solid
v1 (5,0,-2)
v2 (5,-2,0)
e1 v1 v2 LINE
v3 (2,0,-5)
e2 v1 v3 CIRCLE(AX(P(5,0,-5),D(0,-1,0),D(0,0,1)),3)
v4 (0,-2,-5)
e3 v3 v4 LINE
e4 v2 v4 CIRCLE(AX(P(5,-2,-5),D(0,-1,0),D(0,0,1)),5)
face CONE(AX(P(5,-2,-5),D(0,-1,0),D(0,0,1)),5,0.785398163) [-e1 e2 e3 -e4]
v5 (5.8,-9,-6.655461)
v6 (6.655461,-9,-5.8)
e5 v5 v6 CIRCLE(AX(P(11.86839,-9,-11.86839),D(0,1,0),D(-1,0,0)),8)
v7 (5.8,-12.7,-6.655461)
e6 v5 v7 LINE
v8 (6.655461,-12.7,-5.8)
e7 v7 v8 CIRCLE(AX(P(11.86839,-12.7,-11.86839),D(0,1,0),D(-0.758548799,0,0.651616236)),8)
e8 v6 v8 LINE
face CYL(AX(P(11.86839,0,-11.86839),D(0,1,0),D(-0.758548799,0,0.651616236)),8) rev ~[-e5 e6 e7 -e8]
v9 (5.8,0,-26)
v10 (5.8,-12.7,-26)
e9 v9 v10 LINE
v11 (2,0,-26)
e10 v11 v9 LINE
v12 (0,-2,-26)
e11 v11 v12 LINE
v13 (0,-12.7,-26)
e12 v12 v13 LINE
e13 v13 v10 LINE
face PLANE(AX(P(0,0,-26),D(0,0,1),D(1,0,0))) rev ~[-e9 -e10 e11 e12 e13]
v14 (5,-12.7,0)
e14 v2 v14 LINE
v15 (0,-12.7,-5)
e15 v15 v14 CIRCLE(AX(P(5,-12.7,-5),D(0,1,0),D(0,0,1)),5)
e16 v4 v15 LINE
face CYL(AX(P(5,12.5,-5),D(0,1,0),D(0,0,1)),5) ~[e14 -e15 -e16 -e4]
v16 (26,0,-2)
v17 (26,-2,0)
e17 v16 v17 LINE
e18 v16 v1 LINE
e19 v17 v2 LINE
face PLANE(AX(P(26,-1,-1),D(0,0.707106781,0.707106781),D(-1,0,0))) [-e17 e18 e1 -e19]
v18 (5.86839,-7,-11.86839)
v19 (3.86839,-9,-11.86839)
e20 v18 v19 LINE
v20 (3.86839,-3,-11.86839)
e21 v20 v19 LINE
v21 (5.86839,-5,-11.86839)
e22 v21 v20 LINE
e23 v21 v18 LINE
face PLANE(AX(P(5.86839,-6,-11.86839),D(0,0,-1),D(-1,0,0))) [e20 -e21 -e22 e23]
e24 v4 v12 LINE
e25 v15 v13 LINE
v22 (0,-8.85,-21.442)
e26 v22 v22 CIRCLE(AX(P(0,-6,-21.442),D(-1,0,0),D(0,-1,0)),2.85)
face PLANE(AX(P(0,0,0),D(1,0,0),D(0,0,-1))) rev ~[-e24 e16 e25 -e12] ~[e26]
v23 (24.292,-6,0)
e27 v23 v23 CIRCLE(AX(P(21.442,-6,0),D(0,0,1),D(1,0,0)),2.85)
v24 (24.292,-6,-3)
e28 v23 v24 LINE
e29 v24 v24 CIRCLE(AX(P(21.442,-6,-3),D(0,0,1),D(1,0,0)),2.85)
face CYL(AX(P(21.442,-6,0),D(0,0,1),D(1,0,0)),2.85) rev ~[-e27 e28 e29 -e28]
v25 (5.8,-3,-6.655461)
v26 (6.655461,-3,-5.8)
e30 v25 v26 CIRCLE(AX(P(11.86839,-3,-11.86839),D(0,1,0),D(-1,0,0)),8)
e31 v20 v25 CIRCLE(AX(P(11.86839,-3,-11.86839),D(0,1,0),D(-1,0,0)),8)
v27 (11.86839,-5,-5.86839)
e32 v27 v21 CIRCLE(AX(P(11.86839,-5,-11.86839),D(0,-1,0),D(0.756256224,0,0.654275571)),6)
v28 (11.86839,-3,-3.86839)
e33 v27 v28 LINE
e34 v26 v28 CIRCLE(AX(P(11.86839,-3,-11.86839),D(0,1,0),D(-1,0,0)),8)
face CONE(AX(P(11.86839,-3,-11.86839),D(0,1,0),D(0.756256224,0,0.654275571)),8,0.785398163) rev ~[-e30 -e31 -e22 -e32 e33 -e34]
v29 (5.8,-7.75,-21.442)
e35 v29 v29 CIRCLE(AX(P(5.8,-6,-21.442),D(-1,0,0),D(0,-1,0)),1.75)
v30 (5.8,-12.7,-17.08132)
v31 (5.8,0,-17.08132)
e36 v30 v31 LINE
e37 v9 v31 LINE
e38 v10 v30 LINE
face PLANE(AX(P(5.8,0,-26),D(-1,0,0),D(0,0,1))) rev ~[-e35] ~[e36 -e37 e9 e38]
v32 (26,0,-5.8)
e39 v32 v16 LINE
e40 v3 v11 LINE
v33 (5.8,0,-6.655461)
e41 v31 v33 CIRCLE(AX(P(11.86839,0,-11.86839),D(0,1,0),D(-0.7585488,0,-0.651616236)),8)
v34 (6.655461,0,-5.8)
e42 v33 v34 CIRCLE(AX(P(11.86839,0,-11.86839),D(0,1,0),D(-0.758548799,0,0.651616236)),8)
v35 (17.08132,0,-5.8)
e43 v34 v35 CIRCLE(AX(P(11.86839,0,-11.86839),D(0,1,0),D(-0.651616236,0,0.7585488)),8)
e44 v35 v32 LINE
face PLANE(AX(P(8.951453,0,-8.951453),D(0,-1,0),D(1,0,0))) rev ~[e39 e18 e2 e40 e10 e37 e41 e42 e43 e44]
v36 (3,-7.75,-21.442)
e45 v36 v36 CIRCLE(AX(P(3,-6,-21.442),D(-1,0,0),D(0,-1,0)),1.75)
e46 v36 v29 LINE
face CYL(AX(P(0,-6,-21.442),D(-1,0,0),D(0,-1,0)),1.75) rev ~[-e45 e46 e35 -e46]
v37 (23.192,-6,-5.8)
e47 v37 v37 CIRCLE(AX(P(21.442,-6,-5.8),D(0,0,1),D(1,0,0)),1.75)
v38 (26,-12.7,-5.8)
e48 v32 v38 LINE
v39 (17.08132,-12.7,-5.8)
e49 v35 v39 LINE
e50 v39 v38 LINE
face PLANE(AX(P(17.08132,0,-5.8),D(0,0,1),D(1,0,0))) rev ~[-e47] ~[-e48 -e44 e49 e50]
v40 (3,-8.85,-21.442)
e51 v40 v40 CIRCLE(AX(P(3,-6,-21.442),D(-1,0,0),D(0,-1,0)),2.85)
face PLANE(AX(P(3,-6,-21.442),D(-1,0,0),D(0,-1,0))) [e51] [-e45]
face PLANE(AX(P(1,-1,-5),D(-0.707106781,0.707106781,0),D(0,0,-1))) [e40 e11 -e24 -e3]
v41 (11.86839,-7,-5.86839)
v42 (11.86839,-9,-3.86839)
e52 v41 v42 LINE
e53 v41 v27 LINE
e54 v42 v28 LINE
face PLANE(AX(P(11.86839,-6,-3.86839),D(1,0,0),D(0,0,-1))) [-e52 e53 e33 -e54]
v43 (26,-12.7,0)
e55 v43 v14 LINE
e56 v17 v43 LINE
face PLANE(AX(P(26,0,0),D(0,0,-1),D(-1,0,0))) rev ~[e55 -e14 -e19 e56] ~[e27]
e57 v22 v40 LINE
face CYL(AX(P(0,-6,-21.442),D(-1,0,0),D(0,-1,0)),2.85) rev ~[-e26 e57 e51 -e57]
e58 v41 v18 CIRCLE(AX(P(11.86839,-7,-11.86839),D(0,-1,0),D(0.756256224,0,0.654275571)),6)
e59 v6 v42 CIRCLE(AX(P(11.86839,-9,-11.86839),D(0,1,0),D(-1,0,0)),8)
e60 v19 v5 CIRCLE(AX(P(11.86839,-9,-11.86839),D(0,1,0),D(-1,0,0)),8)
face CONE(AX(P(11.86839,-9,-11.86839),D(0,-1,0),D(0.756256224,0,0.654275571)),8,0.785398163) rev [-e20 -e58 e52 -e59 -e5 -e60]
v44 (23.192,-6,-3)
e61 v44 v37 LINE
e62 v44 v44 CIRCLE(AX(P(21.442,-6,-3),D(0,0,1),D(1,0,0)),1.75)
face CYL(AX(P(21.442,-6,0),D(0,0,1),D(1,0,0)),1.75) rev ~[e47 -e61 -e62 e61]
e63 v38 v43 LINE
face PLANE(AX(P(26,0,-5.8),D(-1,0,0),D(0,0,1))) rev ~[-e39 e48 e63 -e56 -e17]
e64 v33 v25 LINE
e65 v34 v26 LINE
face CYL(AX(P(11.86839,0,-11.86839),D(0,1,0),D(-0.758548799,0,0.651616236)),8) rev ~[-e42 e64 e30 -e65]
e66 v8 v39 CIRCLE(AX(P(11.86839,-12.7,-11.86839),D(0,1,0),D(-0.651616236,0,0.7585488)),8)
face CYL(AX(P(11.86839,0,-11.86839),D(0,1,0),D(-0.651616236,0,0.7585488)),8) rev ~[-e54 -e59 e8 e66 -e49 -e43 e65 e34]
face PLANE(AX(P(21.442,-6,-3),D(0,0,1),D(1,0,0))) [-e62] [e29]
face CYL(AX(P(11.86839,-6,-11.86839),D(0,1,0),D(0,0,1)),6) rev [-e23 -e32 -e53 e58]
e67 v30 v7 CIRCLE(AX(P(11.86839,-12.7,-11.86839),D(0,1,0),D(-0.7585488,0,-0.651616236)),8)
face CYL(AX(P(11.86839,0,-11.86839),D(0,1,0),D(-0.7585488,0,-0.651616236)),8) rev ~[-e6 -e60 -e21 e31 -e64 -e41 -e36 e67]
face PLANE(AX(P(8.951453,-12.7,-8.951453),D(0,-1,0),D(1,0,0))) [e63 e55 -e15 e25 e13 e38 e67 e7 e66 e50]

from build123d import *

# Parameters (mm, degrees)
F1_DEPTH     = 12.7
F3_R         = 1.75
F4_DEPTH     = 26.001
F5_R         = 1.75
F6_DEPTH     = 26.001
F8_DEPTH     = 3
F9_T4_ANGLE  = 188.2705145196
F9_S5_R      = 8
F9_T6_DEPTH  = 11
F9_T10_ANGLE = 188.2705145196
F9_S11_R     = 8
F9_T12_DEPTH = 11
F10_R        = 2.85
F10_R_2      = 1.75
F11_DEPTH    = 3
F12_R        = 2.85
F13_DEPTH    = 3
F14_T1_DEPTH = 37.7
F15_SIZE     = 2


# Not quite as in the source:
# - a fillet or chamfer that OpenCascade refuses, or shapes differently, is made with other operations: its cross-section is extruded or revolved along the edge and cut away or added


with BuildPart() as f1:
    # F0 (on Front) → F1 (new body)
    with BuildSketch(Plane.XZ):
        with BuildLine():
            Line((26, 0), (0, 0))
            Line((0, 0), (0, -26))
            Line((0, -26), (5.8, -26))
            Line((5.8, -26), (5.8, -17.0813202825))
            ThreePointArc((5.8, -17.0813202825), (3.8683903961, -11.8683903961), (5.8, -6.6554605098))
            Line((5.8, -6.6554605098), (5.8, -5.8))
            Line((5.8, -5.8), (6.6554605098, -5.8))
            ThreePointArc((6.6554605098, -5.8), (11.8683903961, -3.8683903961), (17.0813202825, -5.8))
            Line((17.0813202825, -5.8), (26, -5.8))
            Line((26, -5.8), (26, 0))
        make_face()
        with BuildLine():
            ThreePointArc((5.8, -6.6554605098), (6.2115361467, -6.2115361467), (6.6554605098, -5.8))
            Line((6.6554605098, -5.8), (5.8, -5.8))
            Line((5.8, -5.8), (5.8, -6.6554605098))
        make_face()
    extrude(amount=F1_DEPTH)

    # F3 (on face) → F4 (cut, through all)
    with BuildSketch(Plane.XY):
        with Locations((21.442, -6)):
            Circle(F3_R)
    extrude(amount=-F4_DEPTH, mode=Mode.SUBTRACT)

    # F5 (on face) → F6 (cut, through all)
    with BuildSketch(Plane(origin=(0, 0, 0), x_dir=(0, -1, 0), z_dir=(-1, 0, 0))):
        with Locations((6, -21.442)):
            Circle(F5_R)
    extrude(amount=-F6_DEPTH, mode=Mode.SUBTRACT)

    # F7 (on offset) → F8 (join, symmetric)
    with BuildSketch(Plane(origin=(0, -6, 0), x_dir=(-1, 0, 0), z_dir=(0, 1, 0))):
        with BuildLine():
            ThreePointArc((-3.8683903961, -11.8683903961), (-6.2115361467, -6.2115361467), (-11.8683903961, -3.8683903961))
            Line((-11.8683903961, -3.8683903961), (-11.8683903961, -5.8683903961))
            ThreePointArc((-11.8683903961, -5.8683903961), (-7.625749709, -7.625749709), (-5.8683903961, -11.8683903961))
            Line((-5.8683903961, -11.8683903961), (-3.8683903961, -11.8683903961))
        make_face()
    extrude(amount=F8_DEPTH, both=True)

    # F9: chamfer of 2 on 2 edges, made by hand


with BuildPart() as f9_tool2:
    # F9_s3 → F9_t4 (revolve)
    with BuildSketch(Plane(origin=(10.953058548, 0, -12.6602903485), x_dir=(0, 1, 0), z_dir=(0.6542755714, 0, -0.7562562242))):
        Polygon((-9, 9.2103462012), (-7, 7.2103462012), (-9, 7.2103462012), align=None)
    revolve(axis=Axis((11.8683903961, -9, -11.8683903961), (0, -1, 0)), revolution_arc=F9_T4_ANGLE)

    # F9_s5 → F9_t6 (intersect, symmetric)
    with BuildSketch(Plane.XZ.offset(8)):
        with Locations((11.8683903961, -11.8683903961)):
            Circle(F9_S5_R)
    extrude(amount=F9_T6_DEPTH, both=True, mode=Mode.INTERSECT)


with BuildPart() as f1_1:
    add(f1.part)

    # F9_t1: cut F9_tool2
    add(f9_tool2.part, mode=Mode.SUBTRACT)


with BuildPart() as f9_tool8:
    # F9_s9 → F9_t10 (revolve)
    with BuildSketch(Plane(origin=(10.953058548, 0, -12.6602903485), x_dir=(0, 1, 0), z_dir=(0.6542755714, 0, -0.7562562242))):
        Polygon((-3, 9.2103462012), (-5, 7.2103462012), (-3, 7.2103462012), align=None)
    revolve(axis=Axis((11.8683903961, -3, -11.8683903961), (0, -1, 0)), revolution_arc=F9_T10_ANGLE)

    # F9_s11 → F9_t12 (intersect, symmetric)
    with BuildSketch(Plane.XZ.offset(4)):
        with Locations((11.8683903961, -11.8683903961)):
            Circle(F9_S11_R)
    extrude(amount=F9_T12_DEPTH, both=True, mode=Mode.INTERSECT)


with BuildPart() as f1_2:
    add(f1_1.part)

    # F9_t7: cut F9_tool8
    add(f9_tool8.part, mode=Mode.SUBTRACT)

    # F10 (on face) → F11 (cut)
    with BuildSketch(Plane(origin=(0, 0, 0), x_dir=(0, -1, 0), z_dir=(-1, 0, 0))):
        with Locations((6, -21.442)):
            Circle(F10_R)
        with Locations((6, -21.442)):
            Circle(F10_R_2, mode=Mode.SUBTRACT)
    extrude(amount=-F11_DEPTH, mode=Mode.SUBTRACT)

    # F12 (on face) → F13 (cut)
    with BuildSketch(Plane.XY):
        with Locations((21.442, -6)):
            Circle(F12_R)
    extrude(amount=-F13_DEPTH, mode=Mode.SUBTRACT)

    # F14: fillet of radius 5 on 1 edges, made by hand

    # F14_s2 → F14_t1 (cut)
    with BuildSketch(Plane.XZ.offset(-12.5)):
        with BuildLine():
            ThreePointArc((5, 0), (1.4644660941, -1.4644660941), (0, -5))
            Line((0, -5), (0, 0))
            Line((0, 0), (5, 0))
        make_face()
    extrude(amount=F14_T1_DEPTH, mode=Mode.SUBTRACT)

    # F15
    f15_edges = [f1_2.edges().sort_by_distance(p)[0] for p in [
        (0, 0, -15.5),
        (1.464466, 0, -1.464466),
        (15.5, 0, 0),
    ]]
    chamfer(f15_edges, length=F15_SIZE)


solid = f1_2.part
